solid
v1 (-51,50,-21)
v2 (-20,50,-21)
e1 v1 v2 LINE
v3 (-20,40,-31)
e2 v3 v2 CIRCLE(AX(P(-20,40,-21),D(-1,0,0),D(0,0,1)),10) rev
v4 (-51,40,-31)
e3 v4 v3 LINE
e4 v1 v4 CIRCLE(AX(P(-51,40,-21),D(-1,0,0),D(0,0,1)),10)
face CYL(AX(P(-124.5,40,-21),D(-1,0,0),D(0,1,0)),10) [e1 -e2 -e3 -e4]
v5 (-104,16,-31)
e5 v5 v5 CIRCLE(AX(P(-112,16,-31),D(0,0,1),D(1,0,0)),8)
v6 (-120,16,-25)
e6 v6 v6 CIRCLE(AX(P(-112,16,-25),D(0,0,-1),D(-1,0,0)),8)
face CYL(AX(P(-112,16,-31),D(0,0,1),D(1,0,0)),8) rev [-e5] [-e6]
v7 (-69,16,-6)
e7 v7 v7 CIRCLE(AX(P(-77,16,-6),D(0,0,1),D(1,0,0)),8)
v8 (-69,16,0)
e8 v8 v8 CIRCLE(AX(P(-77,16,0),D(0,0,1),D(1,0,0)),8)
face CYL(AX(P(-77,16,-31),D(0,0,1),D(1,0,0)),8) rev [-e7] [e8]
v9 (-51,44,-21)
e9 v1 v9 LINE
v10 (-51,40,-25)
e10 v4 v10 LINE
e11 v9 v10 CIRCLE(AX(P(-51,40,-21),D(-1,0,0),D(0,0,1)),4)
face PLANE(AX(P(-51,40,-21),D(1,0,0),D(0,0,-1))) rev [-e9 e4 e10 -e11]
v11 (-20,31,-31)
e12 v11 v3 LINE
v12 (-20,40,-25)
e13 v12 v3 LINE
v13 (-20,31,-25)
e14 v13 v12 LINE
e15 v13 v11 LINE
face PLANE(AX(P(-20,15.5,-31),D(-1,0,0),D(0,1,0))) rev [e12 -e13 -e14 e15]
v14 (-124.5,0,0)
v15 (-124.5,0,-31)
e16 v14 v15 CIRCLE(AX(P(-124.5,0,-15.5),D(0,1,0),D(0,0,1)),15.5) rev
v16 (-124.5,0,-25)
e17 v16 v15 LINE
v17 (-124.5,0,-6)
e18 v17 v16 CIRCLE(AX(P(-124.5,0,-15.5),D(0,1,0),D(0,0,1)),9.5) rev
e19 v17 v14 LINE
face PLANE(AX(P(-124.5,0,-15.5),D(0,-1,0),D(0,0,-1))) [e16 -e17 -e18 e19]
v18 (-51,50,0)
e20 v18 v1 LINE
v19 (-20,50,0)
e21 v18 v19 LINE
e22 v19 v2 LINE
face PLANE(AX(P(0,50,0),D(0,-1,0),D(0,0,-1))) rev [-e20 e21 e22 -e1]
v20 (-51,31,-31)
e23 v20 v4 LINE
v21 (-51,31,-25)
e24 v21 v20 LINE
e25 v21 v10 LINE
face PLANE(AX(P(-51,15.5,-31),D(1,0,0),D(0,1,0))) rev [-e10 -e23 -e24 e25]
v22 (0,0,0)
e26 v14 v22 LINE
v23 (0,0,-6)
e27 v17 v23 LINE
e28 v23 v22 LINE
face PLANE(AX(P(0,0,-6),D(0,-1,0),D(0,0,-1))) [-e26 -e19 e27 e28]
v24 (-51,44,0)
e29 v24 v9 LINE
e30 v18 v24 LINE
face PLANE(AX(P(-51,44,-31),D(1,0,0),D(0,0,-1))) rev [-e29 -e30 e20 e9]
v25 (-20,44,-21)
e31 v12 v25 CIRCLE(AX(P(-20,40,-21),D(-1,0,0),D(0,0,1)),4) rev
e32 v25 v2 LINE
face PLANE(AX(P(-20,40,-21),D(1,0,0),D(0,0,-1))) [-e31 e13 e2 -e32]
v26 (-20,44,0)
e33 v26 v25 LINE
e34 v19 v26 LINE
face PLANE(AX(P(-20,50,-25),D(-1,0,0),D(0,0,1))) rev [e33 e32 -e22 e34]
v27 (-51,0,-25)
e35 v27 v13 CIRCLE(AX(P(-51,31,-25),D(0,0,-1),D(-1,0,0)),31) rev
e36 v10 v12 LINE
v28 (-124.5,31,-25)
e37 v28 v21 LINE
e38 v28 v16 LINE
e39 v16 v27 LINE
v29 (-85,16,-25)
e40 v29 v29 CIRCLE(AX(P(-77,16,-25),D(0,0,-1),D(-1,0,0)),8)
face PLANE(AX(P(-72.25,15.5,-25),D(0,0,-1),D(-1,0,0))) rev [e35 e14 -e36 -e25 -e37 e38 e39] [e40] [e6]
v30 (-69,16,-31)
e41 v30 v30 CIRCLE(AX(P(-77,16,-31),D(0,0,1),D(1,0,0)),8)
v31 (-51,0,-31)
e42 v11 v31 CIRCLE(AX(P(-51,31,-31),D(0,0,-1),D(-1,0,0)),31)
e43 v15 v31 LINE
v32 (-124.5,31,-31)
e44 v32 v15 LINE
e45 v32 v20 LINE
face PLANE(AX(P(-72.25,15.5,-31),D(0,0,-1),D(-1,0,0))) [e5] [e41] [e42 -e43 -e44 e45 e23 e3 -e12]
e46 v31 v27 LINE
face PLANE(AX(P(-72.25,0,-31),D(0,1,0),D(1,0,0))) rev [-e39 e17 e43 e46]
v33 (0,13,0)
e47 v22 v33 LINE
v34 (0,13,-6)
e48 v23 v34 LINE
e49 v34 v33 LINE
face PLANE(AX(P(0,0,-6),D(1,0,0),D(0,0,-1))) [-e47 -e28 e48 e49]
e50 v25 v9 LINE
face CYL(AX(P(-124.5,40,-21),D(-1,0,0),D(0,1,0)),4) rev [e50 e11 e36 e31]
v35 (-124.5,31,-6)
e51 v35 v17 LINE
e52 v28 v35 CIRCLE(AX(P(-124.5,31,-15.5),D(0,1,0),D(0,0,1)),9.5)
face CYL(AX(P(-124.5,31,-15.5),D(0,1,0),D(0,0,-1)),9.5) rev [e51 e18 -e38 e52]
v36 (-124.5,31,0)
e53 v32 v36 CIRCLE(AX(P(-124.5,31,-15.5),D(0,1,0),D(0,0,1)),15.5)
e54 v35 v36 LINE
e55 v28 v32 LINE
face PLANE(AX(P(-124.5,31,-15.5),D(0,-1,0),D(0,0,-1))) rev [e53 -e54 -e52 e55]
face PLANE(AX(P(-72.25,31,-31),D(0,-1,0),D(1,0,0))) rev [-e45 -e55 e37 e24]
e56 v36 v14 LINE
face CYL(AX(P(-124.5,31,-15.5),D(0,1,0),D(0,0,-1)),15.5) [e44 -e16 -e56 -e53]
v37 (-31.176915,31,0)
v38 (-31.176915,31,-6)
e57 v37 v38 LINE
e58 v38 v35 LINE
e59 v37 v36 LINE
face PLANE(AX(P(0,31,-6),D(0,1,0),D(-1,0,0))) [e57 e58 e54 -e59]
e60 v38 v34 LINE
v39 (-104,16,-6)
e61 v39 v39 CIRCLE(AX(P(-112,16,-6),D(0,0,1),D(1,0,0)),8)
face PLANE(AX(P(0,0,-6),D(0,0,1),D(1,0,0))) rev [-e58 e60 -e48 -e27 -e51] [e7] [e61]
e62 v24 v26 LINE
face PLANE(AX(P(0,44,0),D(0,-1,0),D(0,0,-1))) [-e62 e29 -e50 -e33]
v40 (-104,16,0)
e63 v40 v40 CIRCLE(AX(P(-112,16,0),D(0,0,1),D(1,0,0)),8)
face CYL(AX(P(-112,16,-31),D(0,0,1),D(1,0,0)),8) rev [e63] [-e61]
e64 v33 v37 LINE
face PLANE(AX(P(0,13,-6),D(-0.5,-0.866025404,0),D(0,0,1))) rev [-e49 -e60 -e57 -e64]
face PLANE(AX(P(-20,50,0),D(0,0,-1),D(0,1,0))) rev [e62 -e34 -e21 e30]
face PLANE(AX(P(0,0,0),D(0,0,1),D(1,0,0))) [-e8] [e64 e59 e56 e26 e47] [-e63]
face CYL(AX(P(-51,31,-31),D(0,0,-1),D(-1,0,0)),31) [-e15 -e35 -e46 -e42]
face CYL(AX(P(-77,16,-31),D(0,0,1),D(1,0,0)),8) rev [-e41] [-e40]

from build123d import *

# Parameters (mm, degrees)
SKETCH_1_W             = 140
SKETCH_1_H             = 31
SM_BASE_FLANGE_1_DEPTH = 6
OTHER_1_DEPTH          = 31
OTHER_1_2_DEPTH        = 31
SM_EDGE_FLANGE_1_DEPTH = 104.5
SKETCH_21_W            = 73.5
SKETCH_21_H            = 19
CUT_EXTRUDE_1_DEPTH    = 152.858486756
SKETCH_22_R            = 8
CUT_EXTRUDE_2_DEPTH    = 152.858486756
CHAMFER_1_SIZE         = 18
CHAMFER_1_SIZE2        = 31.176914536
FILLET_1_R             = 31


# Read off the part's stored shape, not the designer's step: 褶边1
# Sheet-metal steps are written as plain solids
with BuildPart() as part:
    # Sketch 1 → 基体-法兰1 (new body)
    with BuildSketch(Plane.XY):
        with Locations((-70, 15.5)):
            Rectangle(SKETCH_1_W, SKETCH_1_H)
    extrude(amount=-SM_BASE_FLANGE_1_DEPTH)

    # Other 1 outline → Other 1 (cut)
    with BuildSketch(Plane(origin=(0, 0, 0), x_dir=(1, 0, 0), z_dir=(0, 1, 0))):
        with BuildLine():
            ThreePointArc((-124.5, 0), (-131.319090848, 1.580589093), (-136.747448714, 6))
            Line((-136.747448714, 6), (-140, 6))
            Line((-140, 6), (-140, 0))
            Line((-140, 0), (-124.5, 0))
        make_face()
    extrude(amount=OTHER_1_DEPTH, mode=Mode.SUBTRACT)

    # Other 1 2 outline → Other 1 2 (add)
    with BuildSketch(Plane(origin=(0, 0, 0), x_dir=(1, 0, 0), z_dir=(0, 1, 0))):
        with BuildLine():
            Line((-20, 25), (-20, 31))
            Line((-20, 31), (-124.5, 31))
            ThreePointArc((-124.5, 31), (-138.419410907, 22.319090848), (-136.747448714, 6))
            Line((-136.747448714, 6), (-124.5, 6))
            ThreePointArc((-124.5, 6), (-134, 15.5), (-124.5, 25))
            Line((-124.5, 25), (-20, 25))
        make_face()
    extrude(amount=OTHER_1_2_DEPTH)

    # 边线-法兰1 section (across the edge) → 边线-法兰1 (add)
    with BuildSketch(Plane(origin=(-20, 44, -25), x_dir=(0, -1, 0), z_dir=(-1, 0, 0))):
        with BuildLine():
            Line((-6, 4), (-6, 25))
            Line((-6, 25), (0, 25))
            Line((0, 25), (0, 4))
            ThreePointArc((0, 4), (1.171572875, 1.171572875), (4, 0))
            Line((4, 0), (13, 0))
            Line((13, 0), (13, -6))
            Line((13, -6), (4, -6))
            ThreePointArc((4, -6), (-3.071067812, -3.071067812), (-6, 4))
        make_face()
    extrude(amount=SM_EDGE_FLANGE_1_DEPTH)

    # 草图21 → 切除-拉伸1 (cut, through all)
    with BuildSketch(Plane.XY):
        with Locations((-87.75, 40.5)):
            Rectangle(SKETCH_21_W, SKETCH_21_H)
    extrude(amount=-CUT_EXTRUDE_1_DEPTH, mode=Mode.SUBTRACT)

    # 草图22 → 切除-拉伸2 (cut, through all)
    with BuildSketch(Plane.XY):
        with Locations((-112, 16)):
            Circle(SKETCH_22_R)
        with Locations((-77, 16)):
            Circle(SKETCH_22_R)
    extrude(amount=-CUT_EXTRUDE_2_DEPTH, mode=Mode.SUBTRACT)

    # 倒角1
    chamfer_1_edges = [part.edges().sort_by_distance(p)[0] for p in [
        (0, 31, -3),
    ]]
    chamfer_1_side = [part.faces().sort_by_distance(p)[0] for p in [
        (0, 15.5, -3),
    ]]
    chamfer(chamfer_1_edges, length=CHAMFER_1_SIZE, length2=CHAMFER_1_SIZE2, reference=chamfer_1_side[0])

    # 圆角1
    fillet_1_edges = [part.edges().sort_by_distance(p)[0] for p in [
        (-20, 0, -28),
    ]]
    fillet(fillet_1_edges, radius=FILLET_1_R)


solid = part.part
